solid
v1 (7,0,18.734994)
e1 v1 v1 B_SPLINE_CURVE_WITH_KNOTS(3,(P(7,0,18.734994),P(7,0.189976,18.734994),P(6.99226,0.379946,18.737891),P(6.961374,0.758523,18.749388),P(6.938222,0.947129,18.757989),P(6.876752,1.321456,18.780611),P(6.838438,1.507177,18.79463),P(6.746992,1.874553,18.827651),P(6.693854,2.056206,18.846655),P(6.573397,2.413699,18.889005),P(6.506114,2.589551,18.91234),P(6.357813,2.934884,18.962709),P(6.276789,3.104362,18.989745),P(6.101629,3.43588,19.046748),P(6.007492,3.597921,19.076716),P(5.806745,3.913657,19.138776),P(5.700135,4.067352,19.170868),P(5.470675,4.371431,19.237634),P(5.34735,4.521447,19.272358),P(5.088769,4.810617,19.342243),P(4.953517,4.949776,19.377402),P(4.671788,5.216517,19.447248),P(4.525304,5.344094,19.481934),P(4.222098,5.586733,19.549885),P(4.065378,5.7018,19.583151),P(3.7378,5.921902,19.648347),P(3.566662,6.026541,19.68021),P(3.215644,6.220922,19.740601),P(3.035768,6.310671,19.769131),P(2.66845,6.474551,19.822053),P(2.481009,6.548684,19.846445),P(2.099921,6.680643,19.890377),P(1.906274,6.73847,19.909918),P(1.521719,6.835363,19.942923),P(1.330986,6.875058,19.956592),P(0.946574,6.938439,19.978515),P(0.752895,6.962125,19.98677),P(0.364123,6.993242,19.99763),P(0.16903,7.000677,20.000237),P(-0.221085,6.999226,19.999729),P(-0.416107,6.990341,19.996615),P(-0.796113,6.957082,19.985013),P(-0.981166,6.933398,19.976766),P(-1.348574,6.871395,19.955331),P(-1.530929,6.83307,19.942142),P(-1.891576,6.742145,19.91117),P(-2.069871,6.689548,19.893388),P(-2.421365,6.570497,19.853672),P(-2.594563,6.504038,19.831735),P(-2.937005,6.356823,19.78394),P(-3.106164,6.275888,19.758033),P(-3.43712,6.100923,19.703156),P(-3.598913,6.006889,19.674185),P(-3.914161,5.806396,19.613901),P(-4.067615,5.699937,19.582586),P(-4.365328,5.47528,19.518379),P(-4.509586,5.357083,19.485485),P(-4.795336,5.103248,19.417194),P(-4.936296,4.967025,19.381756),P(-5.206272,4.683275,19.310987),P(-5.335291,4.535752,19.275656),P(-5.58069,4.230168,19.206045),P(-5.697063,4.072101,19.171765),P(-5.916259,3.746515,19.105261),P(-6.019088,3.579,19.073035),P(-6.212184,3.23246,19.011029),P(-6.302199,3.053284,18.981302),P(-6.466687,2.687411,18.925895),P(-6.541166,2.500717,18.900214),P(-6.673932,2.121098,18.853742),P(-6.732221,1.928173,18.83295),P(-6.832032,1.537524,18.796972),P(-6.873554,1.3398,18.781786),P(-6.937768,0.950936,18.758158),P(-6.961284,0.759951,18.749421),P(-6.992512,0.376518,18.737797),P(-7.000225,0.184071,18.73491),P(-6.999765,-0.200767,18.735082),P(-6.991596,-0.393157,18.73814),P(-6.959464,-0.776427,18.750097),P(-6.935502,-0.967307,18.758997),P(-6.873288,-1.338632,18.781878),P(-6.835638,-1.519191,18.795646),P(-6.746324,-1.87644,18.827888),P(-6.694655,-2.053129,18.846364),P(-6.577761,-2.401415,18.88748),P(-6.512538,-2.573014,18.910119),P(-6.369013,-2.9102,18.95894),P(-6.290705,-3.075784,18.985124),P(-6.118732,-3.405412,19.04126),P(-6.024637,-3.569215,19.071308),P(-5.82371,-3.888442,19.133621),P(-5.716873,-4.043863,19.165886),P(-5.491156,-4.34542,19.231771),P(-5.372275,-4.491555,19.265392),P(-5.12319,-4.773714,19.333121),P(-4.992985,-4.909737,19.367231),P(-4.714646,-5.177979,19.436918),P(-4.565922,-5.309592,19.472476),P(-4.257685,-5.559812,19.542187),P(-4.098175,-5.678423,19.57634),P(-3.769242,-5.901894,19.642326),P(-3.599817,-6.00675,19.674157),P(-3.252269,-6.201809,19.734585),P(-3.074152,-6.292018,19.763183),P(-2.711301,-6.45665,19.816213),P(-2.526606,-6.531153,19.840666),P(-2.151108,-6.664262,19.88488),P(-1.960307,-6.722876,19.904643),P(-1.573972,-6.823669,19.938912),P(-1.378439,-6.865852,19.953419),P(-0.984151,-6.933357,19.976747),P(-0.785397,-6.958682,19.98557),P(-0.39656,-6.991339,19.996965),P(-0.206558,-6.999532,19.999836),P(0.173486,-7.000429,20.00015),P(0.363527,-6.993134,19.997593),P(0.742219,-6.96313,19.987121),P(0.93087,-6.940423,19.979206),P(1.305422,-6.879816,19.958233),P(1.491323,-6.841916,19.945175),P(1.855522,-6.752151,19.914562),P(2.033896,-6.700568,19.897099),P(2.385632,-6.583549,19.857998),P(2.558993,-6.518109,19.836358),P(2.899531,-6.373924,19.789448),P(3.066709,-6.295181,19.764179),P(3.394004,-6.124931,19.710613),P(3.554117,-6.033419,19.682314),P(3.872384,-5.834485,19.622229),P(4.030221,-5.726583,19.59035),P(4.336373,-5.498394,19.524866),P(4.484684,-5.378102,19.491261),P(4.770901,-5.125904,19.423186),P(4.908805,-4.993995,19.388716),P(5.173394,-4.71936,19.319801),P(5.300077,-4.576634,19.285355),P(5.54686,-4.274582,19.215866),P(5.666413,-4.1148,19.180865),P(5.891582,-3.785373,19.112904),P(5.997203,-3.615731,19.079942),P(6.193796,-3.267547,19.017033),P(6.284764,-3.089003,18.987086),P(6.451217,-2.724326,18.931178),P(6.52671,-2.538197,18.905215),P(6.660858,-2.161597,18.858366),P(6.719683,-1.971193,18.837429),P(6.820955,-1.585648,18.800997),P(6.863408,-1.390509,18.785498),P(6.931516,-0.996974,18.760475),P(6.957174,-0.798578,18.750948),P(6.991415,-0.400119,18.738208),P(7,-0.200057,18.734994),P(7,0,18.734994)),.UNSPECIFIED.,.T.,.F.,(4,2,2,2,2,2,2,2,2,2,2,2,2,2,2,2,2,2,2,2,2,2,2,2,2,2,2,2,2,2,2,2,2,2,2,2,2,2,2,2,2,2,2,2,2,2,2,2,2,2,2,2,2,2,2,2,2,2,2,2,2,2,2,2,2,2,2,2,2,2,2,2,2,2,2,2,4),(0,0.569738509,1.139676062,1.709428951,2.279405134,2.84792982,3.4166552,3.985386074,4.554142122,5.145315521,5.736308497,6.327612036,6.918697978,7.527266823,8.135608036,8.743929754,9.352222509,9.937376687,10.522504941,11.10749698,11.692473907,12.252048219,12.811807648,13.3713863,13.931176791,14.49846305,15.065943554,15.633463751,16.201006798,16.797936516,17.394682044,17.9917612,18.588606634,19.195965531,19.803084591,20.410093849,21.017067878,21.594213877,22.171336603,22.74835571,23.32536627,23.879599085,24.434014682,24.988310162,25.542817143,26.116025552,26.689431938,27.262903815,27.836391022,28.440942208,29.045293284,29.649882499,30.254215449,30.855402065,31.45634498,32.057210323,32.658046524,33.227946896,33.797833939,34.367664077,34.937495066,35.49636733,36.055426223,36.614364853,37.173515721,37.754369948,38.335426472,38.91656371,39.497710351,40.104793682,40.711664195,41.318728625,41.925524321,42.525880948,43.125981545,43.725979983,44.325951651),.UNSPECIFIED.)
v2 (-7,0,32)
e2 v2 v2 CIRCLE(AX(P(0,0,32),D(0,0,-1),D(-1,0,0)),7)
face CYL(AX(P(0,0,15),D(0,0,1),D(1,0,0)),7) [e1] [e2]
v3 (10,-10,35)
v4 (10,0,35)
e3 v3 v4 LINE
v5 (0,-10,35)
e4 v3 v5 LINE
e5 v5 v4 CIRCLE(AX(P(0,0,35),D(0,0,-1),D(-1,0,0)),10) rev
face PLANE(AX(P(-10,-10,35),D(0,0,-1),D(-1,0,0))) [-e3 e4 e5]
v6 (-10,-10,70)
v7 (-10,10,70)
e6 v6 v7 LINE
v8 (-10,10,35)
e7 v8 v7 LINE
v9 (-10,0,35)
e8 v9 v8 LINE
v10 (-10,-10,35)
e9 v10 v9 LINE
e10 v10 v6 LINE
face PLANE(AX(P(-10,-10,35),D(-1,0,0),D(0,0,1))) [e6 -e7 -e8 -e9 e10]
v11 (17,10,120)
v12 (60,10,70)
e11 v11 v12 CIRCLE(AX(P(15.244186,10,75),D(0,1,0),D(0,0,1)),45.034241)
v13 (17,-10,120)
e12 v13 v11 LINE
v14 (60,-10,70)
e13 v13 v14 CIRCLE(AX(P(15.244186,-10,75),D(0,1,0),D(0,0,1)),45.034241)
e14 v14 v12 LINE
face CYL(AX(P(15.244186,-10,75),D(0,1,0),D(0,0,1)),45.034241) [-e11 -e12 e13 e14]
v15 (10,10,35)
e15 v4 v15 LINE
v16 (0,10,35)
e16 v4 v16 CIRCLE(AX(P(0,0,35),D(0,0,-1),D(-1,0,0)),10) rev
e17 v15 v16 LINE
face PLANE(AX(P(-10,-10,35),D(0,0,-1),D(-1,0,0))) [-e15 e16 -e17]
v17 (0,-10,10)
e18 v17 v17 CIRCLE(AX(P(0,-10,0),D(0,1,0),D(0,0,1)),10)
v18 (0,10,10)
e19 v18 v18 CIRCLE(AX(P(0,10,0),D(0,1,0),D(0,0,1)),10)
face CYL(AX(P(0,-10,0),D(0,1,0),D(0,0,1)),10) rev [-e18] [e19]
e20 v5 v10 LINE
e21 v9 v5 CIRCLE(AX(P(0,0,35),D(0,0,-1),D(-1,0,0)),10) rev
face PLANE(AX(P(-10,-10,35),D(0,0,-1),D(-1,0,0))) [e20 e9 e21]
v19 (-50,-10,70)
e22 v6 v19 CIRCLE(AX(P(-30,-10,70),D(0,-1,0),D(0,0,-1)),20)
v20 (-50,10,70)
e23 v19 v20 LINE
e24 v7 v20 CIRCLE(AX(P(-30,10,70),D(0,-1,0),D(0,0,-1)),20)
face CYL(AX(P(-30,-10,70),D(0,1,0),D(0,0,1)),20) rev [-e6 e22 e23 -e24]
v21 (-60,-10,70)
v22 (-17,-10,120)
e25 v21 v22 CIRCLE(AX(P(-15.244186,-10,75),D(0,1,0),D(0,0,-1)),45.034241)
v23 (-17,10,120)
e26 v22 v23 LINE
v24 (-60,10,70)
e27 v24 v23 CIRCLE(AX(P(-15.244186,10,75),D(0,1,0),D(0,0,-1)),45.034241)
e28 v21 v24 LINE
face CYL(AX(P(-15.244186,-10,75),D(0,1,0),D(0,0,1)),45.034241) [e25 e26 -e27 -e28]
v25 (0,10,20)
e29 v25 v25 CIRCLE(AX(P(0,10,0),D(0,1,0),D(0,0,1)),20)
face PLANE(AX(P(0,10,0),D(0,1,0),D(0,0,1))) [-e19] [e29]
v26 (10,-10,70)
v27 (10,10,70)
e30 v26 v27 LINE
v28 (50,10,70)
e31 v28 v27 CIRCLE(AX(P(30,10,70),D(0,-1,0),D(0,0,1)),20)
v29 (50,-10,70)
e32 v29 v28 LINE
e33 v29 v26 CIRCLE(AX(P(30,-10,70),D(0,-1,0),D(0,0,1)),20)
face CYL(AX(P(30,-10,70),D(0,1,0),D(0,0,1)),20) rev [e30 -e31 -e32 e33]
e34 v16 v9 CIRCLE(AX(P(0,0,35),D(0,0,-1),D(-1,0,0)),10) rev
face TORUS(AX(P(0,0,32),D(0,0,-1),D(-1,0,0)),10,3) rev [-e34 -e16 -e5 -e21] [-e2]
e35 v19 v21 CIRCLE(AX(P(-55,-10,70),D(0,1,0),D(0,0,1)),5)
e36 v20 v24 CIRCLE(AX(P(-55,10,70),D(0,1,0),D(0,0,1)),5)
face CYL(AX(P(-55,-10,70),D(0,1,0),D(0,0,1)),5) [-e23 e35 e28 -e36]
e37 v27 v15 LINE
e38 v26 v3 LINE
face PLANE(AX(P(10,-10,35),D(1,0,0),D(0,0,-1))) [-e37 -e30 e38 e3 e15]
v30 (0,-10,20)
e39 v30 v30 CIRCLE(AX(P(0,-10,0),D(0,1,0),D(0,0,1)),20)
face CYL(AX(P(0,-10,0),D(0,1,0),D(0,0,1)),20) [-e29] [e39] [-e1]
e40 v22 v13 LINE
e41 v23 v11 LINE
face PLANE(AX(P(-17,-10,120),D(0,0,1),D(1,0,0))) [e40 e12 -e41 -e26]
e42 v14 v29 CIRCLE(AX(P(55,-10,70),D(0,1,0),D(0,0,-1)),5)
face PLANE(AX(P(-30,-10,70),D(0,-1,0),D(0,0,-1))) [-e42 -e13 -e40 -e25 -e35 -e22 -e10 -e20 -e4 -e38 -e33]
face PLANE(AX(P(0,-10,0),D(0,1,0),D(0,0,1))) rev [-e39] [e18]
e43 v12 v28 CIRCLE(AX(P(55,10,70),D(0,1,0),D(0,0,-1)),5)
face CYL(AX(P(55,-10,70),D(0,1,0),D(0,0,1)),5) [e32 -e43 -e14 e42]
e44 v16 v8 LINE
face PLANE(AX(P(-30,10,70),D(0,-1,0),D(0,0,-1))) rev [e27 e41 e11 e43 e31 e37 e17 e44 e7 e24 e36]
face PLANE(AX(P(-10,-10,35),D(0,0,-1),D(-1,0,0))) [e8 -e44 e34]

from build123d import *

# Parameters (mm, degrees)
BOSS_EXTRUDE1_DEPTH        = 10
BOSS_EXTRUDE1_DEPTH_BACK   = 10
SKETCH4_R                  = 20
SKETCH4_R_2                = 10
BOSS_EXTRUDE1_2_DEPTH      = 10
BOSS_EXTRUDE1_2_DEPTH_BACK = 10
SKETCH6_R                  = 7
BOSS_EXTRUDE2_DEPTH        = 20
FILLET1_R                  = 3


with BuildPart() as part:
    # Sketch4 → Boss-Extrude1 (new, two sides: drawn at the far end of the back side and taken through both)
    with BuildSketch(Plane(origin=(0, 0, 0), x_dir=(1, 0, 0), z_dir=(0, 1, 0)).offset(-BOSS_EXTRUDE1_DEPTH_BACK)):
        with Locations(Location((0, 0, 0), (0, 0, 270))):
            Circle(SKETCH4_R)
        with Locations(Location((0, 0, 0), (0, 0, 270))):
            Circle(SKETCH4_R_2, mode=Mode.SUBTRACT)
    extrude(amount=BOSS_EXTRUDE1_DEPTH + BOSS_EXTRUDE1_DEPTH_BACK)



with BuildPart() as body_2:
    # Sketch4 → Boss-Extrude1 2 (new, two sides: drawn at the far end of the back side and taken through both)
    with BuildSketch(Plane(origin=(0, 0, 0), x_dir=(1, 0, 0), z_dir=(0, 1, 0)).offset(-BOSS_EXTRUDE1_2_DEPTH_BACK)):
        with BuildLine():
            Line((-10, -35), (10, -35))
            Line((10, -35), (10, -70))
            ThreePointArc((10, -70), (30, -90), (50, -70))
            ThreePointArc((50, -70), (55, -65), (60, -70))
            ThreePointArc((60, -70), (49.38848107, -104.36409372), (17, -120))
            Line((17, -120), (-17, -120))
            ThreePointArc((-17, -120), (-49.38848107, -104.36409372), (-60, -70))
            ThreePointArc((-60, -70), (-55, -65), (-50, -70))
            ThreePointArc((-50, -70), (-30, -90), (-10, -70))
            Line((-10, -70), (-10, -35))
        make_face()
    extrude(amount=BOSS_EXTRUDE1_2_DEPTH + BOSS_EXTRUDE1_2_DEPTH_BACK)


with BuildPart() as part_1:
    add(part.part)

    add(body_2.part)  # Boss-Extrude2 merges body 2
    # Sketch6 → Boss-Extrude2 (add)
    with BuildSketch(Plane(origin=(0, 0, 35), x_dir=(-1, 0, 0), z_dir=(0, 0, -1))):
        with Locations(Location((0, 0, 0), (0, 0, 180))):
            Circle(SKETCH6_R)
    extrude(amount=BOSS_EXTRUDE2_DEPTH)

    # Fillet1
    fillet1_edges = [part_1.edges().sort_by_distance(p)[0] for p in [
        (-7, 0, 35),
    ]]
    fillet(fillet1_edges, radius=FILLET1_R - 0.0001)  # a hair under: the kernel refuses the full size


solid = part_1.part
